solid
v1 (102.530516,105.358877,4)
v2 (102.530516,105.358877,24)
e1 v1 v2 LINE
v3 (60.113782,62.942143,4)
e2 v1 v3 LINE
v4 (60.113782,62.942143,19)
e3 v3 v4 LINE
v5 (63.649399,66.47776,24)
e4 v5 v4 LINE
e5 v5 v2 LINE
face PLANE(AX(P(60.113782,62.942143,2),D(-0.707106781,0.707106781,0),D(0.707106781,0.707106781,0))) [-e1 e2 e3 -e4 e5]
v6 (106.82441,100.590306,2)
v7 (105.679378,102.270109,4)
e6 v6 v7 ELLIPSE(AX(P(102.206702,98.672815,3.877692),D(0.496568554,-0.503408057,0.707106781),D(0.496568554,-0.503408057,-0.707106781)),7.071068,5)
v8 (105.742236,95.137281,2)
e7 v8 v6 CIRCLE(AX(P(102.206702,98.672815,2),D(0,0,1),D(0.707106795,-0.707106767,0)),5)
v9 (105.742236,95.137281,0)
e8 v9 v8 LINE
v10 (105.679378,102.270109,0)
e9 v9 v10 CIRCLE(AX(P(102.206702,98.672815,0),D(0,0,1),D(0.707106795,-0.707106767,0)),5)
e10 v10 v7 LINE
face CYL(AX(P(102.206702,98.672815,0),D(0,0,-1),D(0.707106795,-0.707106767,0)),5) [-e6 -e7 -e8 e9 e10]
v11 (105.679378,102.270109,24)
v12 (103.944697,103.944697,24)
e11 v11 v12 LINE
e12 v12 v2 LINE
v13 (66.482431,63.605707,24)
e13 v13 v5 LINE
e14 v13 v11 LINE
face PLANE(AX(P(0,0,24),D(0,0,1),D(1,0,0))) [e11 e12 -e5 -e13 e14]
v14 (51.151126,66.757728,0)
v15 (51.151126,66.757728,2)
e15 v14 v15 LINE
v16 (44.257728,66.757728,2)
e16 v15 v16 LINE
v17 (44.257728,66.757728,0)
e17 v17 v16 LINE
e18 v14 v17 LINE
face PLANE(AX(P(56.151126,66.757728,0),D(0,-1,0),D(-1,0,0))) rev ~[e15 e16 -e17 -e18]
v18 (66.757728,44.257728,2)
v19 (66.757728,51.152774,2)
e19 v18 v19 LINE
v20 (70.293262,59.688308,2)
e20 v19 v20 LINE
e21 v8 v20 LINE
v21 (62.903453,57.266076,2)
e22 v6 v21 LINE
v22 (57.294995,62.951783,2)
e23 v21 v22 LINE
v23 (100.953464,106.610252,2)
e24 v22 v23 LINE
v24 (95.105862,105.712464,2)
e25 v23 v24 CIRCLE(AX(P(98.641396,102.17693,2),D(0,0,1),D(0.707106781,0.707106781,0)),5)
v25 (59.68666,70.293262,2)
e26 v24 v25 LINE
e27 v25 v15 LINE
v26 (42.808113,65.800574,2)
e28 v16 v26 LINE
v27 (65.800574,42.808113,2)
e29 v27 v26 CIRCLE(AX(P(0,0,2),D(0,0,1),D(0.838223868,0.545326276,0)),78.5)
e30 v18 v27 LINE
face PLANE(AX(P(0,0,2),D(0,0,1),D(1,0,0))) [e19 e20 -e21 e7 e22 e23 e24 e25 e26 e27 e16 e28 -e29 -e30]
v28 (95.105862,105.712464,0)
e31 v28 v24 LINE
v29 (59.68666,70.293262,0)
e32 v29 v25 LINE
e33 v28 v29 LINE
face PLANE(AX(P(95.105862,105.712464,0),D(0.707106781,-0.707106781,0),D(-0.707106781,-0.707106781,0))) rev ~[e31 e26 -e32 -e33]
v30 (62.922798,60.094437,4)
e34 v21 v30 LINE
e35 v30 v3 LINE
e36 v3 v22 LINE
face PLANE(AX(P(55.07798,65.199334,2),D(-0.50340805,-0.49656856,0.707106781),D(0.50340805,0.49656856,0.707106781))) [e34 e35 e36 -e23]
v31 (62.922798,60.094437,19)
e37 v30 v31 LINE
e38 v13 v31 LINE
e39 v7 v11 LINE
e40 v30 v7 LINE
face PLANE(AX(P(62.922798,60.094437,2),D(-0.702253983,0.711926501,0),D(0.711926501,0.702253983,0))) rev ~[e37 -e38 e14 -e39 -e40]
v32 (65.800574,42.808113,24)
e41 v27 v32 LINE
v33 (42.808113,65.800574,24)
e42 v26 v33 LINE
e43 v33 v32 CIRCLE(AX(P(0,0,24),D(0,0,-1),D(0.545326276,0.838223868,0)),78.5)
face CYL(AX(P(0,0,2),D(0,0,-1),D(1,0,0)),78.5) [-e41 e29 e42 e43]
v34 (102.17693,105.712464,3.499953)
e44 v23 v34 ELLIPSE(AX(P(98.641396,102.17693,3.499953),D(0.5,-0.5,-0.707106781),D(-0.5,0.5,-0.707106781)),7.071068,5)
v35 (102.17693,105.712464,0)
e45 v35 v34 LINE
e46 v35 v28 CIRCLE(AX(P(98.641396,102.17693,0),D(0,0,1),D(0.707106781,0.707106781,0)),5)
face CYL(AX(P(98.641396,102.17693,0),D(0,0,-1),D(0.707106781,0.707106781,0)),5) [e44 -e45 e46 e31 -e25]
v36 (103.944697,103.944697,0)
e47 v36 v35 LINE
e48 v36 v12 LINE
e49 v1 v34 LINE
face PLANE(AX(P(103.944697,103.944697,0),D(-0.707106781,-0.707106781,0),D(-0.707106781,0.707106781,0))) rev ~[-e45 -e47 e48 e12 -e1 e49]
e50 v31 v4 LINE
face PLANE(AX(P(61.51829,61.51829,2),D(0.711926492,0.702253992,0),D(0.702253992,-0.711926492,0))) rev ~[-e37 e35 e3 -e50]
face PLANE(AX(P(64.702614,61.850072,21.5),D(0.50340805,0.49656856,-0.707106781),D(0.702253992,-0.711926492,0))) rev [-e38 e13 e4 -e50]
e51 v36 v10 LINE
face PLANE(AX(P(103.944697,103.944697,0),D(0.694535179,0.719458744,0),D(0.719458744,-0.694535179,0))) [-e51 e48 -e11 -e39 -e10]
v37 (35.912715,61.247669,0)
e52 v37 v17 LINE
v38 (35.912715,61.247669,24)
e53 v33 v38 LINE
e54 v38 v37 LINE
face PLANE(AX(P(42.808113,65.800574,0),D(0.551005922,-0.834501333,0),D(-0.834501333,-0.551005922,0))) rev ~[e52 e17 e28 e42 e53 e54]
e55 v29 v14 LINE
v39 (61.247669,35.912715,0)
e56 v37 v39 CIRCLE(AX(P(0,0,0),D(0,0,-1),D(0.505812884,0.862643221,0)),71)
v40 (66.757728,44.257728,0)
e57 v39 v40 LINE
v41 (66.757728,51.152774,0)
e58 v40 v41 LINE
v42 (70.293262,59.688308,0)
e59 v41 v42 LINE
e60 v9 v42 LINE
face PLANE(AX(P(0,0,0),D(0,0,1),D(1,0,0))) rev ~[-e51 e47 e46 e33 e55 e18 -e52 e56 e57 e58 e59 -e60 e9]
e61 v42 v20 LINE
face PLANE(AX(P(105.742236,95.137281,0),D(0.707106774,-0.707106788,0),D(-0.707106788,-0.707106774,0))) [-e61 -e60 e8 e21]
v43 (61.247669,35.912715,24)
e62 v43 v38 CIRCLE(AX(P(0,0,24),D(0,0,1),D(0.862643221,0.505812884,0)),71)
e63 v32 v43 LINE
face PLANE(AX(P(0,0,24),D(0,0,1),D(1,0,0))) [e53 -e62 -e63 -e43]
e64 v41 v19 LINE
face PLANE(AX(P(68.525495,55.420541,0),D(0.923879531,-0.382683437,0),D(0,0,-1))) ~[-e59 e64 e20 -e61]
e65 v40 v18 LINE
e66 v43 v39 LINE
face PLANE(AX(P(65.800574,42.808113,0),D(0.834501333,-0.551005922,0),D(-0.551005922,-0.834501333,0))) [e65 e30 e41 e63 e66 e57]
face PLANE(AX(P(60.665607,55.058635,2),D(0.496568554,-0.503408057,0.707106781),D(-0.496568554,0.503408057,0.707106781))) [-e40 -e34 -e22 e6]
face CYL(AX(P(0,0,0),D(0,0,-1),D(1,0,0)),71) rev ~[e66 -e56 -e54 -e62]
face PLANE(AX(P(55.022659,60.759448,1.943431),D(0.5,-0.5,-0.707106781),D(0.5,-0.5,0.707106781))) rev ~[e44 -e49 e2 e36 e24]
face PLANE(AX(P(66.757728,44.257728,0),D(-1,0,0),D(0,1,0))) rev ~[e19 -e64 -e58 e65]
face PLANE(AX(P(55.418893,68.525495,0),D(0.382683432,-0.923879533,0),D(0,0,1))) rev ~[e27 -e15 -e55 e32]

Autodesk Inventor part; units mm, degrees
ref_plane "YZ Plane" through (0, 0, 0) normal (1, 0, 0) x (0, 1, 0)
ref_plane "XZ Plane" through (0, 0, 0) normal (0, 1, 0) x (-1, 0, 0)
ref_plane "XY Plane" through (0, 0, 0) normal (0, 0, 1) x (1, 0, 0)
ref_plane "Work Plane1" through (0, 0, 0) normal (0, 0, 1) x (1, 0, 0)
sketch "Sketch1" plane through (0, 0, 0) normal (0, 0, 1) x (1, 0, 0)
  circle A0 centre (0, 0) radius 78.5
  line L0 (0, 0) -> (103.944697, 103.944697)
  line L1 (0, 0) -> (147, 0) construction
  line L2 (103.944697, 103.944697) -> (102.17693, 105.712464)
  line L3 (103.944697, 103.944697) -> (105.679378, 102.270109)
  circle A1 centre (0, 0) radius 71
  line L4 (105.742236, 95.137281) -> (55.226256, 44.621302)
  line L5 (109.340638, 98.735683) -> (180.781021, 98.735683) construction
  line L6 (95.105862, 105.712464) -> (44.620391, 55.226993)
  line L7 (98.641396, 109.247998) -> (170.038634, 109.247998) construction
  line L8 (44.257728, 44.257728) -> (66.757728, 44.257728)
  line L9 (66.757728, 44.257728) -> (66.757728, 66.757728)
  line L10 (66.757728, 66.757728) -> (44.257728, 66.757728)
  line L11 (44.257728, 66.757728) -> (44.257728, 44.257728)
  line L12 (44.257728, 44.257728) -> (66.757728, 66.757728) construction
  line L13 (66.757728, 44.257728) -> (44.257728, 66.757728) construction
  arc A2 (102.17693, 105.712464) -> (95.105862, 105.712464) centre (98.641396, 102.17693) ccw
  arc A3 (105.742236, 95.137281) -> (105.679378, 102.270109) centre (102.206702, 98.672815) ccw
  line L14 (44.257728, 66.757728) -> (35.912715, 61.247669)
  line L15 (66.757728, 44.257728) -> (61.247669, 35.912715)
  point P0 (55.507728, 55.507728)
  point P1 (55.518047, 44.257728)
  point P2 (66.757728, 56.152774)
  point P3 (56.151126, 66.757728)
  point P4 (44.257728, 55.518047)
  dimension "d0" = 157
  dimension "d1" = 147
  dimension "d2" = 45
  dimension "d3" = 7.5
  dimension "d4" = 7.5
  dimension "d5" = 142
  dimension "d6" = 135
  dimension "d7" = 135
  dimension "d8" = 22.5
  dimension "d9" = 22.5
  dimension "d10" = 5
  dimension "d34" = 10
  dimension "d35" = 10
extrude "Extrusion1" add sketch "Sketch1" along normal blind 2 contours L15 A1 L8 A0 | A0 L8 L15 | L14 L11 A0 | A0 L11 A1 L14 | L8 A1 L4 A0 | A0 L4 L9 L8 | L11 L10 L6 A0 | A0 L6 A1 L11 | L4 A1 L0 A0 | A0 L0 L9 L4 | L9 L0 L3 A3 L4 | L6 L10 L0 A0 | A0 L0 A1 L6 | L6 A2 L2 L0 L10
sketch "Sketch2" plane through (0, 0, 2) normal (0, 0, 1) x (1, 0, 0)
  circle A0 centre (0, 0) radius 78.5
  circle A1 centre (0, 0) radius 71
  line L0 (105.679378, 102.270109) -> (103.944697, 103.944697)
  line L1 (103.944697, 103.944697) -> (61.51829, 61.51829)
  line L2 (103.944697, 103.944697) -> (163.944697, 103.944697) construction
  line L3 (103.944697, 103.944697) -> (102.17693, 105.712464)
  line L4 (44.257728, 66.757728) -> (44.257728, 55.518047)
  line L5 (55.518047, 44.257728) -> (66.757728, 44.257728)
  line L6 (46.257728, 66.757728) -> (46.257728, 55.518047)
  line L7 (55.518047, 46.257728) -> (66.757728, 46.257728)
  line L8 (61.51829, 61.51829) -> (60.113782, 62.942143)
  line L9 (60.113782, 62.942143) -> (62.922798, 60.094437)
  arc A2 (105.742236, 95.137281) -> (105.679378, 102.270109) centre (102.206702, 98.672815) ccw
  line L10 (62.922798, 60.094437) -> (105.679378, 102.270109)
  line L11 (60.113782, 62.942143) -> (102.530516, 105.358877)
  line L12 (60.113782, 62.942143) -> (120.100103, 62.942143) construction
  line L13 (46.257728, 55.518047) -> (46.257728, 53.862998)
  line L14 (55.518047, 46.257728) -> (53.862998, 46.257728)
  line L15 (56.151126, 66.757728) -> (44.257728, 66.757728)
  line L16 (44.257728, 66.757728) -> (35.912715, 61.247669)
  line L17 (66.757728, 44.257728) -> (61.247669, 35.912715)
  point P0 (58.399252, 46.257728)
  point P1 (63.422966, 46.257728)
  point P2 (46.257728, 63.422966)
  point P3 (46.257728, 58.399252)
  point P4 (44.257728, 64.834432)
  point P5 (64.834432, 44.257728)
  point P6 (65.800574, 42.808113)
  point P7 (42.808113, 65.800574)
  dimension "d13" = 157
  dimension "d14" = 7.5
  dimension "d16" = 135
  dimension "d21" = 2
  dimension "d22" = 2
  dimension "d25" = 60
  dimension "d26" = 2
  dimension "d27" = 4
  dimension "d28" = 45
  dimension "d32" = 10
  dimension "d33" = 10
extrude "Extrusion2" add sketch "Sketch2" along normal blind 22 contours L17 A1 L5 A0 | A0 L4 A1 L16 | L5 A1 L14 L7 A0 | A0 L6 L13 A1 L4 | L7 L14 A1 L13 L6 A0 | L10 L9 L1 L0 | L1 L8 L11 L3
chamfer "Chamfer1" distance 2 angle 45 3 edges at (84.3011, 81.1823, 2) (81.3221, 84.1505, 2) (61.5183, 61.5183, 2)
chamfer "Chamfer2" distance 5 angle 45 3 edges at (66.7577, 56.1528, 1) (56.1511, 66.7577, 1) (61.5183, 61.5183, 24)
properties part number "HourGuard"
